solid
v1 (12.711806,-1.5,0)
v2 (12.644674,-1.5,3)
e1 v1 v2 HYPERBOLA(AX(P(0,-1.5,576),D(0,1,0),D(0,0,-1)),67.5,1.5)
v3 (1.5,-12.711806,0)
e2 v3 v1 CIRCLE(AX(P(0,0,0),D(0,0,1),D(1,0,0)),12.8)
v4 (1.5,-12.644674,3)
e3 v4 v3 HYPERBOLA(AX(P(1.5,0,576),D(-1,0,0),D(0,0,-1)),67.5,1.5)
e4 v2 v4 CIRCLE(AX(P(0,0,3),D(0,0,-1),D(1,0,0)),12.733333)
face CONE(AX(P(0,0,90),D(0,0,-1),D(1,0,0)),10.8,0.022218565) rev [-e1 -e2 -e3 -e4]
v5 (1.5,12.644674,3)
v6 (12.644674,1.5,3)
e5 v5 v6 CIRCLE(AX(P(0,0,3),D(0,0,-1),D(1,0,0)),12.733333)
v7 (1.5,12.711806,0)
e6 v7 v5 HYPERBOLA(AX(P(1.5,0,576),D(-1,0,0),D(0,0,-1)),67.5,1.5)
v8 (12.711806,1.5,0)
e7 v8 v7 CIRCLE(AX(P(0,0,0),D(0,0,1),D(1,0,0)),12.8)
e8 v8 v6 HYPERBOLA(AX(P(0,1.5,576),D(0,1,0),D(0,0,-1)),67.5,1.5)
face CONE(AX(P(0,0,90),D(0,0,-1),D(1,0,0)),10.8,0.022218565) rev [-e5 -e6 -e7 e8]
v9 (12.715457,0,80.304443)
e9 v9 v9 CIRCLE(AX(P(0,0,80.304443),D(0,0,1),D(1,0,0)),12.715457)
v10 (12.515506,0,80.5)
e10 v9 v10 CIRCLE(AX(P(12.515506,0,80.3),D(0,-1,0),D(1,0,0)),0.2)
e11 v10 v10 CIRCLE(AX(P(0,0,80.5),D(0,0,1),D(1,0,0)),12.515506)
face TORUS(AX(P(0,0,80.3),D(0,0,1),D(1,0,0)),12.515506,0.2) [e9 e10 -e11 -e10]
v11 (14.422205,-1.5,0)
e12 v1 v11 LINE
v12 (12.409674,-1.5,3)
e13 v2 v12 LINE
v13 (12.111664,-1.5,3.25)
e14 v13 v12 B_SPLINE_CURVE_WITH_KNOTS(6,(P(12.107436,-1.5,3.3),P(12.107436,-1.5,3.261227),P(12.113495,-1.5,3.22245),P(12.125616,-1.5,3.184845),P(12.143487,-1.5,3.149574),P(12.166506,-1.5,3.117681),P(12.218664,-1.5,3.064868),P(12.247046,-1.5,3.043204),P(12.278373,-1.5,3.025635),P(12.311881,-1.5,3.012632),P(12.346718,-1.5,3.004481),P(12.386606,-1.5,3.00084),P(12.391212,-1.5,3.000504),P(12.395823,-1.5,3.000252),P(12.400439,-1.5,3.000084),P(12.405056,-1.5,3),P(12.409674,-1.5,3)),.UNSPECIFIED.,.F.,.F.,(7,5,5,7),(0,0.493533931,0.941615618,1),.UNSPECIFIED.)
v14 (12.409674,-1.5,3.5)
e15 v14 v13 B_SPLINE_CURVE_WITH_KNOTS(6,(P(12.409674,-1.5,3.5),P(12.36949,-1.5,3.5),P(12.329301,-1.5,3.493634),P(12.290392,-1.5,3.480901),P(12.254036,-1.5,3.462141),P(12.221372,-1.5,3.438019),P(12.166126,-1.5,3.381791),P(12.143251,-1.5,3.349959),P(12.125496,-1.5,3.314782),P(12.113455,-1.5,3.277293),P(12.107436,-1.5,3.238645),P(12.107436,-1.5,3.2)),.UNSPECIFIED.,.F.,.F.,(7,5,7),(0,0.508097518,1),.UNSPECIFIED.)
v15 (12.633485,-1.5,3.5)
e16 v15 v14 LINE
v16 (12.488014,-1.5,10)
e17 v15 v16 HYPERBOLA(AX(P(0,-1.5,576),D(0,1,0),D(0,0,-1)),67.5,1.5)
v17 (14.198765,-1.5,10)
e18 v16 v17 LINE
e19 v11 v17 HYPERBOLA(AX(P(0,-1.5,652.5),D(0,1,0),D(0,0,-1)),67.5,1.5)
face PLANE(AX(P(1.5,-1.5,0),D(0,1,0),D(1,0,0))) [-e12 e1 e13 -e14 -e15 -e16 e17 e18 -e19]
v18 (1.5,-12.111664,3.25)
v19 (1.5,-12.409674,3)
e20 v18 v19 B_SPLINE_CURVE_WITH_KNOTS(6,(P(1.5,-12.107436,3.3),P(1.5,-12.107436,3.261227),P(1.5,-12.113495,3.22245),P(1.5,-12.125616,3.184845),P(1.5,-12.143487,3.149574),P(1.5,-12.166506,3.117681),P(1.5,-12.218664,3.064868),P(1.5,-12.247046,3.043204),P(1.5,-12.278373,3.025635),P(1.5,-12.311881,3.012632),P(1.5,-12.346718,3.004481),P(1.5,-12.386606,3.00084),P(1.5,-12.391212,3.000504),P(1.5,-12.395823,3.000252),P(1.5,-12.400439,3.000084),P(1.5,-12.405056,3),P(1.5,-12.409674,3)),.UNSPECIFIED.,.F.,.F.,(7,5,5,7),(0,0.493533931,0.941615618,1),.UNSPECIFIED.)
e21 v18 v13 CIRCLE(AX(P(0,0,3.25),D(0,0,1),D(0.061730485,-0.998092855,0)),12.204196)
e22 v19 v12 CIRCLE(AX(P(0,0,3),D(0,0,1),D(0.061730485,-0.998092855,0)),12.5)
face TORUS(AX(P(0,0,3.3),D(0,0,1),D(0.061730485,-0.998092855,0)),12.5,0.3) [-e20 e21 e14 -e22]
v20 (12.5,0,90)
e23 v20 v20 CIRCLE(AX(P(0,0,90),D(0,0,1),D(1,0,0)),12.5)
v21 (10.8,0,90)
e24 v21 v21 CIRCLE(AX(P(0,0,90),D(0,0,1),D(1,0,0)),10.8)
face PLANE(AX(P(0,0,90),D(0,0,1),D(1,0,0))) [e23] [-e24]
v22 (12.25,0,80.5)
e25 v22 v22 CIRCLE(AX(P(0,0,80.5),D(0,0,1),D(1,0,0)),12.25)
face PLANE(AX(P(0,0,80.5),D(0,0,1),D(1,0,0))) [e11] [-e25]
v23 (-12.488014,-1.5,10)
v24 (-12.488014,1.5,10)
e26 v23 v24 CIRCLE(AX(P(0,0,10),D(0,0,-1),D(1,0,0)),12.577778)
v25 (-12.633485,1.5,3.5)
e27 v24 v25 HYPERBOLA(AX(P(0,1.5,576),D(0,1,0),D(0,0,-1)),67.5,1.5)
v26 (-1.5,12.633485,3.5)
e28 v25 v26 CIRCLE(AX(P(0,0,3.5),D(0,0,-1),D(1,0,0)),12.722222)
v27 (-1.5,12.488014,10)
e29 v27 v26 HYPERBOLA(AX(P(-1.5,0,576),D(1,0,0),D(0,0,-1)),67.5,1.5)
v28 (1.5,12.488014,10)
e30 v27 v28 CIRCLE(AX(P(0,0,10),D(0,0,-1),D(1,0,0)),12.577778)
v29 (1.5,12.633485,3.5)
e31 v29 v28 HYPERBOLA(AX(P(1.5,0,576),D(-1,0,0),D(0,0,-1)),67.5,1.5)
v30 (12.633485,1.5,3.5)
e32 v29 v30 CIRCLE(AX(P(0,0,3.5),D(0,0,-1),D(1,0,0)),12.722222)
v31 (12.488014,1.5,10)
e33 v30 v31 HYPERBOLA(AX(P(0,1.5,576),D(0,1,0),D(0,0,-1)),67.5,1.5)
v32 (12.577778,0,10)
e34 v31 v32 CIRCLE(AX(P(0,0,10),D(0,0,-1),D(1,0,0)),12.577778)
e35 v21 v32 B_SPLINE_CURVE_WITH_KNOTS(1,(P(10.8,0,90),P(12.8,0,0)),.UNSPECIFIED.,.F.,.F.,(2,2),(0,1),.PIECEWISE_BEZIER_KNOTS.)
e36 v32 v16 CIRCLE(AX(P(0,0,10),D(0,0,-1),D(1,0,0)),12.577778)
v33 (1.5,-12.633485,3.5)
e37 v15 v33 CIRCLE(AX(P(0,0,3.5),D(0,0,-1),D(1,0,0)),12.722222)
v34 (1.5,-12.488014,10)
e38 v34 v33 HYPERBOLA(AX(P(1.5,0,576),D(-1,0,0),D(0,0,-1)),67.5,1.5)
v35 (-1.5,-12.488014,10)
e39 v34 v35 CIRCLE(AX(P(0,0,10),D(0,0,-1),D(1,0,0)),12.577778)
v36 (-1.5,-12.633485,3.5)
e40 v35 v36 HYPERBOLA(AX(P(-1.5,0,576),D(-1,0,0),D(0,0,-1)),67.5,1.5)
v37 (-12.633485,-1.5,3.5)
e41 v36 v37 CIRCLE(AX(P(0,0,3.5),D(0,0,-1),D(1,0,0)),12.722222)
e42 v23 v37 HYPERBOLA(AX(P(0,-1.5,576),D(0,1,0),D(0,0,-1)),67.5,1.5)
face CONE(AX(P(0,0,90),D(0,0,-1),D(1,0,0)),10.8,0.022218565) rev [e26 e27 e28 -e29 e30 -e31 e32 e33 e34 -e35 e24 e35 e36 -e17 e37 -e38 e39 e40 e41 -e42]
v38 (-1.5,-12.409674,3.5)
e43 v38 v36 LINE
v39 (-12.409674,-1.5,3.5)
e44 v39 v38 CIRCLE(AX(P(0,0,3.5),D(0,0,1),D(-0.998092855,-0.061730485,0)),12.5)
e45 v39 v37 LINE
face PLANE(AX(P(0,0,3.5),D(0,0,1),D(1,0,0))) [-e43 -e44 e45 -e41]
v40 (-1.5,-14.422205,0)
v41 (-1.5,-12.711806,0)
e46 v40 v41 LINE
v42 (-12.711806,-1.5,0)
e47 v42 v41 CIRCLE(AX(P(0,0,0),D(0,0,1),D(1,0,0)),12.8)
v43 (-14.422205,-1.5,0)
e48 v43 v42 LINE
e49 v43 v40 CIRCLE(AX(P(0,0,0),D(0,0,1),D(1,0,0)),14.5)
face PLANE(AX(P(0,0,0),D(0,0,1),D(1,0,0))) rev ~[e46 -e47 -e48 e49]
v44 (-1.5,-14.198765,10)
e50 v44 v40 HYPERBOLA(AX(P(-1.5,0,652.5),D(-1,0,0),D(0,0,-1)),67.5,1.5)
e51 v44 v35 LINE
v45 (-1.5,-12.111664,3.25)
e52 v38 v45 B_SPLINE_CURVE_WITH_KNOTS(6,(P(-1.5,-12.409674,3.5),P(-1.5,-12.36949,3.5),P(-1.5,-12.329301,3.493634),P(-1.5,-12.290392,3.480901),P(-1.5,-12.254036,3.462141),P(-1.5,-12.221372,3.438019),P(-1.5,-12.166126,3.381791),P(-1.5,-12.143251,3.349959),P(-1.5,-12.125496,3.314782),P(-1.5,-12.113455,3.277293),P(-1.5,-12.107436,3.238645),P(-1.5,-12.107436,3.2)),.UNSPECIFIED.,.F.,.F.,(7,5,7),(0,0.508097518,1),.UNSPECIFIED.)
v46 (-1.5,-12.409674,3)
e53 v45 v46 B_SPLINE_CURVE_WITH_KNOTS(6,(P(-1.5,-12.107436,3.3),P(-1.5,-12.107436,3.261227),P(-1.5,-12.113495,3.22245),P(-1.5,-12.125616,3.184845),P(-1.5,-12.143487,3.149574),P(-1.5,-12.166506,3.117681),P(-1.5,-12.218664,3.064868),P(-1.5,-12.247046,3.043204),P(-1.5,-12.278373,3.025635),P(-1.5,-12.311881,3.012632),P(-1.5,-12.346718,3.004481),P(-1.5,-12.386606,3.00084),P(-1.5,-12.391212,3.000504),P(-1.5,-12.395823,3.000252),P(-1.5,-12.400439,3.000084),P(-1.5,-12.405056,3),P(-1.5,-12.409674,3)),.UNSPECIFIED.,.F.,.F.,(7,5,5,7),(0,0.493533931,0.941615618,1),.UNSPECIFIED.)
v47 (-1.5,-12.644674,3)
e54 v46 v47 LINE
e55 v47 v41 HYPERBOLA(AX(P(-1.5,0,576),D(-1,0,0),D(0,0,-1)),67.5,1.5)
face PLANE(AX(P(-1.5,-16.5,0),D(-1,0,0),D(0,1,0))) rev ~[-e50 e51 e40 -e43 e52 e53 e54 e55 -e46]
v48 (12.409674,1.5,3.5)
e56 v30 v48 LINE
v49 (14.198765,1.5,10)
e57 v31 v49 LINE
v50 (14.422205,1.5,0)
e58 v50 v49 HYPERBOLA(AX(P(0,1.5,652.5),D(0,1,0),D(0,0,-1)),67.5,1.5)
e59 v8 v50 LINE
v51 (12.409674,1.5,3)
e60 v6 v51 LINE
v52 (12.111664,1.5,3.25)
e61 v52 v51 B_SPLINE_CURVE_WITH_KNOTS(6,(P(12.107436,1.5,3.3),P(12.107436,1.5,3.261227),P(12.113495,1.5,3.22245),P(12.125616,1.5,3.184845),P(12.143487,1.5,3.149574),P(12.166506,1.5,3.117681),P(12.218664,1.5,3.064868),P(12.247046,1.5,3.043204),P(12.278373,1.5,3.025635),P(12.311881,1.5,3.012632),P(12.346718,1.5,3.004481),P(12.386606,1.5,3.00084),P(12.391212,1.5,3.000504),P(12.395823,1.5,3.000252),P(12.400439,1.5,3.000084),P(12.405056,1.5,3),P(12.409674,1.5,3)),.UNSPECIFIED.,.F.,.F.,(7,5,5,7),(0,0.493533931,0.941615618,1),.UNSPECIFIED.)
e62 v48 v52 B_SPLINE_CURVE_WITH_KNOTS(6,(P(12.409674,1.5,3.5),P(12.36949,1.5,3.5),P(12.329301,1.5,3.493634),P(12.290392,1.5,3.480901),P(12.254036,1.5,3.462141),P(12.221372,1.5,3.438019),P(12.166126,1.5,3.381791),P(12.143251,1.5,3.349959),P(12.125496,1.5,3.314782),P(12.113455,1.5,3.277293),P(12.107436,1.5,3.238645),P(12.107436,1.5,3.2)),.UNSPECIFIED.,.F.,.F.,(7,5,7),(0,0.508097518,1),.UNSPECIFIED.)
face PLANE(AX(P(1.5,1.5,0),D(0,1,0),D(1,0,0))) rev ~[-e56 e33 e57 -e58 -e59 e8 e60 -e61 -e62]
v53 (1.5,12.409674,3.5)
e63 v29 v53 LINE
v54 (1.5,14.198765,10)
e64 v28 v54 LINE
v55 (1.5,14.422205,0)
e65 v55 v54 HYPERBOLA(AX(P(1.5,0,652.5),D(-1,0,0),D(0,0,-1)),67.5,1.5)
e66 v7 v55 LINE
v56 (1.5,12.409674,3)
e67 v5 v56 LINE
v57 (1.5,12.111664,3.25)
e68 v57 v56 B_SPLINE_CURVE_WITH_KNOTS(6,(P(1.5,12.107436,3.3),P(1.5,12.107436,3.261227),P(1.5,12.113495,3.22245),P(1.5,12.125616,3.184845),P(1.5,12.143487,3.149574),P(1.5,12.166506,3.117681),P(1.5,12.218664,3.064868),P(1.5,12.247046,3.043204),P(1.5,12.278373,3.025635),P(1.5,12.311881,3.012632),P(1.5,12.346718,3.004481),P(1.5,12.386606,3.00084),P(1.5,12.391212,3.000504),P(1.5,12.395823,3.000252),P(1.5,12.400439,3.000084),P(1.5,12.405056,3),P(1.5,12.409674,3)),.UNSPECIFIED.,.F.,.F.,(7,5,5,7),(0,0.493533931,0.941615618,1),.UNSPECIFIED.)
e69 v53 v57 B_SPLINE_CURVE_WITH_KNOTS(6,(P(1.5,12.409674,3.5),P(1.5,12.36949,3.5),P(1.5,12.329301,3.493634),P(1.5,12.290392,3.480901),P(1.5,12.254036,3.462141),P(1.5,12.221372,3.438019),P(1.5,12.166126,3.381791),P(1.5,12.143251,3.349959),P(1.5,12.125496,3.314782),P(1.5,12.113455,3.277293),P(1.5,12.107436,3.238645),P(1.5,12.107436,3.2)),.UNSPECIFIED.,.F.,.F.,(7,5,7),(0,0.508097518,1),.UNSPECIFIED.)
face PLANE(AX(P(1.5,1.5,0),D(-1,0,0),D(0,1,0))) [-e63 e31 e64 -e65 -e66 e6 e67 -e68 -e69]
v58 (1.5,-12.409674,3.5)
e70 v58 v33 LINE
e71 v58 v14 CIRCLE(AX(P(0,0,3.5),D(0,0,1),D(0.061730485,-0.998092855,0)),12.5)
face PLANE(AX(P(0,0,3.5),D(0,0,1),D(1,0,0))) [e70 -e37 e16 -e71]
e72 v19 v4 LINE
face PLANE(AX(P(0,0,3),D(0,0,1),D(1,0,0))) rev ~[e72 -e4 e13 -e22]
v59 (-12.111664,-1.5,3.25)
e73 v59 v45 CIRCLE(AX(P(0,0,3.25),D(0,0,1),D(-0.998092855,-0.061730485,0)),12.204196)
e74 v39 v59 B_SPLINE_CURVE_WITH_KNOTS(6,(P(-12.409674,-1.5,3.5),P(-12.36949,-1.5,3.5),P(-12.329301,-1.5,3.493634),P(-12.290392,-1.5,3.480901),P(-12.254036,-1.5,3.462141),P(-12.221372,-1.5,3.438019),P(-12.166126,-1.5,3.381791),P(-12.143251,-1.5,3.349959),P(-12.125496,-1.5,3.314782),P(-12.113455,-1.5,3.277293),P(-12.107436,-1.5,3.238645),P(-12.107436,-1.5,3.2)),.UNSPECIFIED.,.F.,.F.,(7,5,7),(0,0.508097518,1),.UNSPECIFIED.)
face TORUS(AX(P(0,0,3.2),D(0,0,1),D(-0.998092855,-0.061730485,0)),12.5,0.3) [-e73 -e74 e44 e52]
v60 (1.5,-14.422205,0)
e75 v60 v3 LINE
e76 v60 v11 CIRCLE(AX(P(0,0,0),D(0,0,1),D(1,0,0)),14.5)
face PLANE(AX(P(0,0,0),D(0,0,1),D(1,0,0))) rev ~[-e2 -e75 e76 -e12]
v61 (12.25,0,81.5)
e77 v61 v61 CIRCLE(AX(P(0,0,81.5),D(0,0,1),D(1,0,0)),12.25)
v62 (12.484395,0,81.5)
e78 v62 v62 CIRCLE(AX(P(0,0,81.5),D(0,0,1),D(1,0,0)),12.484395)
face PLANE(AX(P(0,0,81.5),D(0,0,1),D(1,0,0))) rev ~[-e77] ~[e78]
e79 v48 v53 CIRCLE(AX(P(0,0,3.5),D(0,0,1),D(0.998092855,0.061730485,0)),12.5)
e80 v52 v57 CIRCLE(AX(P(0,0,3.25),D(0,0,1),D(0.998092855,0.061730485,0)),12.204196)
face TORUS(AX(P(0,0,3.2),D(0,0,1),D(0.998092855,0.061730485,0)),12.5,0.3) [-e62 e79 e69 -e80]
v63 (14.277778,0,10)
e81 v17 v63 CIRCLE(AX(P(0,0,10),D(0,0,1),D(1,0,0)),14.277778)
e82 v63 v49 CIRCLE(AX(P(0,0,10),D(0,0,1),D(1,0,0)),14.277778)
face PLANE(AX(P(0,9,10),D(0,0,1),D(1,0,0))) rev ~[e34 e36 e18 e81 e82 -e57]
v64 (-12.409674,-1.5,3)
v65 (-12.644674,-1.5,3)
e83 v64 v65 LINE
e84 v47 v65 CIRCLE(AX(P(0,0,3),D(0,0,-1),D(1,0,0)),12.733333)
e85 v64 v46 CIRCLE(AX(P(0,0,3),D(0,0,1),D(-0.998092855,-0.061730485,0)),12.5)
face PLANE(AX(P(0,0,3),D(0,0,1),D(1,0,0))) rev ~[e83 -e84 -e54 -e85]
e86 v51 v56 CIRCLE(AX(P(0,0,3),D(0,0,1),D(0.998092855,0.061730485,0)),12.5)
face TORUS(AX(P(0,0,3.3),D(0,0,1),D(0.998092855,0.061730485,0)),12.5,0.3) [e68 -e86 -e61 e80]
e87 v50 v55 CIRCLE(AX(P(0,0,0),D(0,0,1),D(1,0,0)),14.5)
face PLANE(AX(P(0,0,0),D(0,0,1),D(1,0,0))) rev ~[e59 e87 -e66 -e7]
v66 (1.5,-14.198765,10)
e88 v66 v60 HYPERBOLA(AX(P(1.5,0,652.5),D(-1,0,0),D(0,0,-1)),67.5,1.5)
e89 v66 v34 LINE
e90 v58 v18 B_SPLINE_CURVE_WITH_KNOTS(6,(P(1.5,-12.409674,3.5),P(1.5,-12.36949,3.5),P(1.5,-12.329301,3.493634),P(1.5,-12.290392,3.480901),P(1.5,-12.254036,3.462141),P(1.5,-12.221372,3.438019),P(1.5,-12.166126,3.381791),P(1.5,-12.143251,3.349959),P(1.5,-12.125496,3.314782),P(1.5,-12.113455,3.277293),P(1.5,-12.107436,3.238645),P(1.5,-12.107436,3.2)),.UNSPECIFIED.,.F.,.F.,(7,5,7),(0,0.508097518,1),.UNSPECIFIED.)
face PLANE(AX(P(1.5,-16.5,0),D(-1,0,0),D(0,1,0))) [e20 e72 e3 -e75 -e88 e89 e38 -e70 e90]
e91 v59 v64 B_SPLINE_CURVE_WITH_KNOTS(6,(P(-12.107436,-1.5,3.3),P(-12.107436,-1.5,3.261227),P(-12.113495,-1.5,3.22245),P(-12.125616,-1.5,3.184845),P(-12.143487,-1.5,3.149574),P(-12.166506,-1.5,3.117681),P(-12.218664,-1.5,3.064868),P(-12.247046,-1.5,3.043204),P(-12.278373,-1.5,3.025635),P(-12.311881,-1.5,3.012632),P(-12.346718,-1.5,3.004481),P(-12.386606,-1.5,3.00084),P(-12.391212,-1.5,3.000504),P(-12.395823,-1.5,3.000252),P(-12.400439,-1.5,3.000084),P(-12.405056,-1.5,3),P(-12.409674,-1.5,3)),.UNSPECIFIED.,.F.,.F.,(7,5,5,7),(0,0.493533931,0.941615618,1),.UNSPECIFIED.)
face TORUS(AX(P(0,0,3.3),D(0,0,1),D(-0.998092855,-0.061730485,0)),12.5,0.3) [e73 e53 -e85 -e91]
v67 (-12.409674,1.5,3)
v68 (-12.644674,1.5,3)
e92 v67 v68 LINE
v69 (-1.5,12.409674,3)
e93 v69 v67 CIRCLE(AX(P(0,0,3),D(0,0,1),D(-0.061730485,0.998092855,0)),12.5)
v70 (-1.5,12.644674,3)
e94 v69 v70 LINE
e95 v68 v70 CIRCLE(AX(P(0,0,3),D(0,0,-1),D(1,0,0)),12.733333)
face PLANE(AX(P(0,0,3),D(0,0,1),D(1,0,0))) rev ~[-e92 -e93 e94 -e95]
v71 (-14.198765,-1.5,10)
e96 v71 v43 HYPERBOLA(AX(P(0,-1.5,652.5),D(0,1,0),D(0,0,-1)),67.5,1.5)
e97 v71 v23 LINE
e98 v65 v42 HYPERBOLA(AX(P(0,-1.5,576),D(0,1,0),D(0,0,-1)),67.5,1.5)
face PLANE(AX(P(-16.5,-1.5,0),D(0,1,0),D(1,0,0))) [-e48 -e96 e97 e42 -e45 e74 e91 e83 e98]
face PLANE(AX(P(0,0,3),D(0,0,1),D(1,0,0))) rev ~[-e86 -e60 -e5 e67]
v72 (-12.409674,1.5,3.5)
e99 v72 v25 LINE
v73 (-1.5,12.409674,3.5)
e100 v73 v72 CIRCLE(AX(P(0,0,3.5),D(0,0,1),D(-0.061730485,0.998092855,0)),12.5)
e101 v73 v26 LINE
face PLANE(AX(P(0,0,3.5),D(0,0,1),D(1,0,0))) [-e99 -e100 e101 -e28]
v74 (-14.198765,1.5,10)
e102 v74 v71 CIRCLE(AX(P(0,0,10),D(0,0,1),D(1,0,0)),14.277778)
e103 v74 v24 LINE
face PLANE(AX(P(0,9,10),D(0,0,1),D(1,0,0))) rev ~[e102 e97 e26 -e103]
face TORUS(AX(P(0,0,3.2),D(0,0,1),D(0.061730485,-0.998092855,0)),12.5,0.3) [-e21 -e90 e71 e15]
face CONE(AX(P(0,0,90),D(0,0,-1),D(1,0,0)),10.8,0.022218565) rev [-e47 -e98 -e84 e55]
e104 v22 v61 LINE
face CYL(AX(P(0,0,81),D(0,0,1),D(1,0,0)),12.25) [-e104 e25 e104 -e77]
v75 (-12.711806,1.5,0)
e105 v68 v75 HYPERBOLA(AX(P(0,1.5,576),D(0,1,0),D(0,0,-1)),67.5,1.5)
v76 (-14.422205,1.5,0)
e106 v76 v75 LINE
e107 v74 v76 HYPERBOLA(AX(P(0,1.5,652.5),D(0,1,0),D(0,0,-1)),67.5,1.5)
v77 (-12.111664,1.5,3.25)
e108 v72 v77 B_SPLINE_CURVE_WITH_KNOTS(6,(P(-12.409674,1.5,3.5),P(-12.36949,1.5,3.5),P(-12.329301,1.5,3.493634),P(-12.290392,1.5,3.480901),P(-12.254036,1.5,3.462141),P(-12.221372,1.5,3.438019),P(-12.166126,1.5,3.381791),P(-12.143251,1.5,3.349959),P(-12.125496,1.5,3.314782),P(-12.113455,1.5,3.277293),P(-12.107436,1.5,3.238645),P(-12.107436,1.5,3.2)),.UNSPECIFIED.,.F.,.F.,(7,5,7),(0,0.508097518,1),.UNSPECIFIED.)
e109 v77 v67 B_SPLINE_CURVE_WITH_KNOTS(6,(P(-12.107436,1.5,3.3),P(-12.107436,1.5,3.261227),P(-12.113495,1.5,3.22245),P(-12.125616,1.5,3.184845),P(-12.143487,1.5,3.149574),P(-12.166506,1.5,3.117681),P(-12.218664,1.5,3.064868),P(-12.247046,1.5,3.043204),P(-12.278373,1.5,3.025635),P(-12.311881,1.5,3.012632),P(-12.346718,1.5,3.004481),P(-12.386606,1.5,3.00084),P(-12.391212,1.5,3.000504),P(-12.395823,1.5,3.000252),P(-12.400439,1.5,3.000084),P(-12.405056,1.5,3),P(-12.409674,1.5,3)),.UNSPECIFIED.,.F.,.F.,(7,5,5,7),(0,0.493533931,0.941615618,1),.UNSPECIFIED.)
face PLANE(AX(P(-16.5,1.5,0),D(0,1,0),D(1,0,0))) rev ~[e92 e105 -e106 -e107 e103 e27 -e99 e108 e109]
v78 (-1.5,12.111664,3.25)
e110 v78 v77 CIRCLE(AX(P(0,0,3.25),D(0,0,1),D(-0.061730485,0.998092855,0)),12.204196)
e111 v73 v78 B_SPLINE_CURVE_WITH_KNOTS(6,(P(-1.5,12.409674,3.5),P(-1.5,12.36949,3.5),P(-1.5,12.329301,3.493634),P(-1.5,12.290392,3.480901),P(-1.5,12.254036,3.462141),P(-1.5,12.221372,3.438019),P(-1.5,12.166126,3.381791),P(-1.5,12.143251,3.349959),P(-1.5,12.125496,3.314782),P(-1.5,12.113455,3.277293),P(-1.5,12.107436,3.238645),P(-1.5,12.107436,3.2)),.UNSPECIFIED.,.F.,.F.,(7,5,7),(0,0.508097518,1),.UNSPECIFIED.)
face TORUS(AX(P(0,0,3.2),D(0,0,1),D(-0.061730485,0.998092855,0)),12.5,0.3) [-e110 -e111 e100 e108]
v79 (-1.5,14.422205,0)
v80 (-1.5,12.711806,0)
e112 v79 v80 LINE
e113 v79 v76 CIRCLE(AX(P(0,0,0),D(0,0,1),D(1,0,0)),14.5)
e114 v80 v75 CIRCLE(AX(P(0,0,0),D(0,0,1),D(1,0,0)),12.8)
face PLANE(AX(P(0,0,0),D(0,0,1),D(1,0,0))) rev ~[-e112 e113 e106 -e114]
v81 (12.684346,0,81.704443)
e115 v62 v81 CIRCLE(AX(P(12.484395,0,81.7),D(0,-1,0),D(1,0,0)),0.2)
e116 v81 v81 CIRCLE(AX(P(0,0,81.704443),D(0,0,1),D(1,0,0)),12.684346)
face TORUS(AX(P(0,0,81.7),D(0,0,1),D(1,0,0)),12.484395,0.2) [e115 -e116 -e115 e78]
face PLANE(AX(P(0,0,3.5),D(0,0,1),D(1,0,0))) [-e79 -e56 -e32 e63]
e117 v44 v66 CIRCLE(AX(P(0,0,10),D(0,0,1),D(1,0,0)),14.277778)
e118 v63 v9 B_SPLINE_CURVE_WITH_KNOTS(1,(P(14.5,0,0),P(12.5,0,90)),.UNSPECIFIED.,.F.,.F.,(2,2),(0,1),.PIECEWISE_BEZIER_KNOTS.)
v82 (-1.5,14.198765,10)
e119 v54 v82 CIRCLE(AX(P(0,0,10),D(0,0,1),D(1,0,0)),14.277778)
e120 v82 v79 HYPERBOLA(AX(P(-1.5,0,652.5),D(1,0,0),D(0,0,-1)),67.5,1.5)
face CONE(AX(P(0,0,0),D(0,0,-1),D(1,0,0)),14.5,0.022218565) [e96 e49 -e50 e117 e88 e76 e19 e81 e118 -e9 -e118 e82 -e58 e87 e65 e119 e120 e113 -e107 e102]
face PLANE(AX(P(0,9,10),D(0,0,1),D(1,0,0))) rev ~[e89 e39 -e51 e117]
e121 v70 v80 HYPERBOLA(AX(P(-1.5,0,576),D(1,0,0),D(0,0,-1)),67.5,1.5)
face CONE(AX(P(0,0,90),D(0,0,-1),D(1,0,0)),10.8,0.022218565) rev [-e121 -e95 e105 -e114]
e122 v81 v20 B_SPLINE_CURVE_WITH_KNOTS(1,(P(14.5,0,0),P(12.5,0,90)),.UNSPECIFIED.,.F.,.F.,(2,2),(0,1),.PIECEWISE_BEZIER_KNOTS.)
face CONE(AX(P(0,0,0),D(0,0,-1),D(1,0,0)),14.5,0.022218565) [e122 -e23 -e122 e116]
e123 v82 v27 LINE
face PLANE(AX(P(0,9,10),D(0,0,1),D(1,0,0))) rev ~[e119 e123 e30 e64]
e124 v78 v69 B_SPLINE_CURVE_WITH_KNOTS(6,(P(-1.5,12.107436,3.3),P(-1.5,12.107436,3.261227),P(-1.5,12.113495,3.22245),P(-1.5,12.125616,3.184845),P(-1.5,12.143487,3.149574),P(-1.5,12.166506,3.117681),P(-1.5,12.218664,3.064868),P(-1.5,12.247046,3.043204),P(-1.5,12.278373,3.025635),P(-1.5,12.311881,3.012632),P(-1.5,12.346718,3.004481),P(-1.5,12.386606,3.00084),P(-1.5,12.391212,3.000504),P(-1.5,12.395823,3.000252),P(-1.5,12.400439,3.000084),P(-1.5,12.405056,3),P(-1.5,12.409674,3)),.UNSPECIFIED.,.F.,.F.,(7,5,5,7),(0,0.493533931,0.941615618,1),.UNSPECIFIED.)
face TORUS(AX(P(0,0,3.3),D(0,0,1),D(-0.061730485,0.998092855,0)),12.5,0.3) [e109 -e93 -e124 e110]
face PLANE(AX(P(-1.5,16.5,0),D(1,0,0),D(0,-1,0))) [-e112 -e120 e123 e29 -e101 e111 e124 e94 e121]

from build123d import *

# Parameters (mm, degrees)
F0_R          = 14.5
F2_R          = 12.5
F5_R          = 10.8
F4_R          = 12.8
F8_R          = 14.5
F8_R_2        = 12.25
F9_DEPTH      = 0.5
F10_DEPTH     = 0.5
F11_R         = 0.2
F13_R         = 14
F13_R_2       = 12.2
F14_DEPTH     = 0.5
F15_DEPTH     = 0.5
F16_W         = 3
F16_H         = 15
F16_H_2       = 3
F16_W_2       = 15
F17_DEPTH     = 10
F18_T2_ANGLE  = 82.921707092
F18_T4_ANGLE  = 82.921707092
F18_T6_ANGLE  = 82.921707092
F18_T8_ANGLE  = 82.921707092
F18_T10_ANGLE = 82.921707092
F18_T12_ANGLE = 82.921707092
F18_T14_ANGLE = 82.921707092
F18_T16_ANGLE = 82.921707092


# Not quite as in the source:
# - a fillet or chamfer that OpenCascade refuses, or shapes differently, is made with other operations: its cross-section is extruded or revolved along the edge and cut away or added
# - a feature of the source that left no trace in its solid (it failed there, or was rolled back) is left out


with BuildPart() as f3:
    # F0 (on Top) → F3 section 0
    with BuildSketch(Plane.XY):
        Circle(F0_R)
    # F2 (on offset) → F3 section 1
    with BuildSketch(Plane.XY.offset(90)):
        Circle(F2_R)
    loft()

    # F5 (on face) → F6 section 0
    with BuildSketch(Plane.XY.offset(90)):
        Circle(F5_R)
    # F4 (on Top) → F6 section 1
    with BuildSketch(Plane.XY):
        Circle(F4_R)
    loft(mode=Mode.SUBTRACT)

    # F8 (on offset) → F9 (cut)
    with BuildSketch(Plane.XY.offset(81)):
        Circle(F8_R)
        Circle(F8_R_2, mode=Mode.SUBTRACT)
    extrude(amount=F9_DEPTH, mode=Mode.SUBTRACT)

    # F8 (on offset) → F10 (cut)
    with BuildSketch(Plane.XY.offset(81)):
        Circle(F8_R)
        Circle(F8_R_2, mode=Mode.SUBTRACT)
    extrude(amount=-F10_DEPTH, mode=Mode.SUBTRACT)

    # F11
    f11_edges = [f3.edges().sort_by_distance(p)[0] for p in [
        (-12.711111, 0, 80.5),
        (-12.688889, 0, 81.5),
    ]]
    fillet(f11_edges, radius=F11_R)

    # F13 (on offset) → F14 (join)
    with BuildSketch(Plane.XY.offset(3)):
        Circle(F13_R)
        Circle(F13_R_2, mode=Mode.SUBTRACT)
    extrude(amount=F14_DEPTH)

    # F13 (on offset) → F15 (join)
    with BuildSketch(Plane.XY.offset(3)):
        Circle(F13_R)
        Circle(F13_R_2, mode=Mode.SUBTRACT)
    extrude(amount=F15_DEPTH)

    # F16 (on face) → F17 (cut)
    with BuildSketch(Plane.XY):
        with Locations((0, 9)):
            Rectangle(F16_W, F16_H)
        Rectangle(F16_W, F16_H_2)
        with Locations((-9, 0)):
            Rectangle(F16_W_2, F16_H_2)
        with Locations((9, 0)):
            Rectangle(F16_W_2, F16_H_2)
        with Locations((0, -9)):
            Rectangle(F16_W, F16_H)
    extrude(amount=F17_DEPTH, mode=Mode.SUBTRACT)

    # F18: fillet of radius 0.3 on 8 edges, made by hand

    # F18_s1 → F18_t2 (revolve, cut)
    with BuildSketch(Plane(origin=(0, 0, 0), x_dir=(0, 0, 1), z_dir=(-0.0617304854, 0.998092855, 0))):
        with BuildLine():
            ThreePointArc((3.3, -12.2), (3.0878679656, -12.2878679656), (3, -12.5))
            Line((3, -12.5), (3, -12.2))
            Line((3, -12.2), (3.3, -12.2))
        make_face()
    revolve(axis=Axis((0, 0, 3), (0, 0, 1)), revolution_arc=F18_T2_ANGLE, mode=Mode.SUBTRACT)

    # F18_s3 → F18_t4 (revolve, cut)
    with BuildSketch(Plane(origin=(0, 0, 0), x_dir=(0, 0, 1), z_dir=(-0.0617304854, 0.998092855, 0))):
        with BuildLine():
            ThreePointArc((3.5, -12.5), (3.4121320344, -12.2878679656), (3.2, -12.2))
            Line((3.2, -12.2), (3.5, -12.2))
            Line((3.5, -12.2), (3.5, -12.5))
        make_face()
    revolve(axis=Axis((0, 0, 3.5), (0, 0, 1)), revolution_arc=F18_T4_ANGLE, mode=Mode.SUBTRACT)

    # F18_s5 → F18_t6 (revolve, cut)
    with BuildSketch(Plane(origin=(0, 0, 0), x_dir=(0, 0, 1), z_dir=(-0.998092855, -0.0617304854, 0))):
        with BuildLine():
            ThreePointArc((3.3, -12.2), (3.0878679656, -12.2878679656), (3, -12.5))
            Line((3, -12.5), (3, -12.2))
            Line((3, -12.2), (3.3, -12.2))
        make_face()
    revolve(axis=Axis((0, 0, 3), (0, 0, 1)), revolution_arc=F18_T6_ANGLE, mode=Mode.SUBTRACT)

    # F18_s7 → F18_t8 (revolve, cut)
    with BuildSketch(Plane(origin=(0, 0, 0), x_dir=(0, 0, 1), z_dir=(-0.998092855, -0.0617304854, 0))):
        with BuildLine():
            ThreePointArc((3.5, -12.5), (3.4121320344, -12.2878679656), (3.2, -12.2))
            Line((3.2, -12.2), (3.5, -12.2))
            Line((3.5, -12.2), (3.5, -12.5))
        make_face()
    revolve(axis=Axis((0, 0, 3.5), (0, 0, 1)), revolution_arc=F18_T8_ANGLE, mode=Mode.SUBTRACT)

    # F18_s9 → F18_t10 (revolve, cut)
    with BuildSketch(Plane(origin=(0, 0, 0), x_dir=(0, 0, 1), z_dir=(0.0617304854, -0.998092855, 0))):
        with BuildLine():
            ThreePointArc((3.3, -12.2), (3.0878679656, -12.2878679656), (3, -12.5))
            Line((3, -12.5), (3, -12.2))
            Line((3, -12.2), (3.3, -12.2))
        make_face()
    revolve(axis=Axis((0, 0, 3), (0, 0, 1)), revolution_arc=F18_T10_ANGLE, mode=Mode.SUBTRACT)

    # F18_s11 → F18_t12 (revolve, cut)
    with BuildSketch(Plane(origin=(0, 0, 0), x_dir=(0, 0, 1), z_dir=(0.0617304854, -0.998092855, 0))):
        with BuildLine():
            ThreePointArc((3.5, -12.5), (3.4121320344, -12.2878679656), (3.2, -12.2))
            Line((3.2, -12.2), (3.5, -12.2))
            Line((3.5, -12.2), (3.5, -12.5))
        make_face()
    revolve(axis=Axis((0, 0, 3.5), (0, 0, 1)), revolution_arc=F18_T12_ANGLE, mode=Mode.SUBTRACT)

    # F18_s13 → F18_t14 (revolve, cut)
    with BuildSketch(Plane(origin=(0, 0, 0), x_dir=(0, 0, 1), z_dir=(0.998092855, 0.0617304854, 0))):
        with BuildLine():
            ThreePointArc((3.3, -12.2), (3.0878679656, -12.2878679656), (3, -12.5))
            Line((3, -12.5), (3, -12.2))
            Line((3, -12.2), (3.3, -12.2))
        make_face()
    revolve(axis=Axis((0, 0, 3), (0, 0, 1)), revolution_arc=F18_T14_ANGLE, mode=Mode.SUBTRACT)

    # F18_s15 → F18_t16 (revolve, cut)
    with BuildSketch(Plane(origin=(0, 0, 0), x_dir=(0, 0, 1), z_dir=(0.998092855, 0.0617304854, 0))):
        with BuildLine():
            ThreePointArc((3.5, -12.5), (3.4121320344, -12.2878679656), (3.2, -12.2))
            Line((3.2, -12.2), (3.5, -12.2))
            Line((3.5, -12.2), (3.5, -12.5))
        make_face()
    revolve(axis=Axis((0, 0, 3.5), (0, 0, 1)), revolution_arc=F18_T16_ANGLE, mode=Mode.SUBTRACT)


solid = f3.part
